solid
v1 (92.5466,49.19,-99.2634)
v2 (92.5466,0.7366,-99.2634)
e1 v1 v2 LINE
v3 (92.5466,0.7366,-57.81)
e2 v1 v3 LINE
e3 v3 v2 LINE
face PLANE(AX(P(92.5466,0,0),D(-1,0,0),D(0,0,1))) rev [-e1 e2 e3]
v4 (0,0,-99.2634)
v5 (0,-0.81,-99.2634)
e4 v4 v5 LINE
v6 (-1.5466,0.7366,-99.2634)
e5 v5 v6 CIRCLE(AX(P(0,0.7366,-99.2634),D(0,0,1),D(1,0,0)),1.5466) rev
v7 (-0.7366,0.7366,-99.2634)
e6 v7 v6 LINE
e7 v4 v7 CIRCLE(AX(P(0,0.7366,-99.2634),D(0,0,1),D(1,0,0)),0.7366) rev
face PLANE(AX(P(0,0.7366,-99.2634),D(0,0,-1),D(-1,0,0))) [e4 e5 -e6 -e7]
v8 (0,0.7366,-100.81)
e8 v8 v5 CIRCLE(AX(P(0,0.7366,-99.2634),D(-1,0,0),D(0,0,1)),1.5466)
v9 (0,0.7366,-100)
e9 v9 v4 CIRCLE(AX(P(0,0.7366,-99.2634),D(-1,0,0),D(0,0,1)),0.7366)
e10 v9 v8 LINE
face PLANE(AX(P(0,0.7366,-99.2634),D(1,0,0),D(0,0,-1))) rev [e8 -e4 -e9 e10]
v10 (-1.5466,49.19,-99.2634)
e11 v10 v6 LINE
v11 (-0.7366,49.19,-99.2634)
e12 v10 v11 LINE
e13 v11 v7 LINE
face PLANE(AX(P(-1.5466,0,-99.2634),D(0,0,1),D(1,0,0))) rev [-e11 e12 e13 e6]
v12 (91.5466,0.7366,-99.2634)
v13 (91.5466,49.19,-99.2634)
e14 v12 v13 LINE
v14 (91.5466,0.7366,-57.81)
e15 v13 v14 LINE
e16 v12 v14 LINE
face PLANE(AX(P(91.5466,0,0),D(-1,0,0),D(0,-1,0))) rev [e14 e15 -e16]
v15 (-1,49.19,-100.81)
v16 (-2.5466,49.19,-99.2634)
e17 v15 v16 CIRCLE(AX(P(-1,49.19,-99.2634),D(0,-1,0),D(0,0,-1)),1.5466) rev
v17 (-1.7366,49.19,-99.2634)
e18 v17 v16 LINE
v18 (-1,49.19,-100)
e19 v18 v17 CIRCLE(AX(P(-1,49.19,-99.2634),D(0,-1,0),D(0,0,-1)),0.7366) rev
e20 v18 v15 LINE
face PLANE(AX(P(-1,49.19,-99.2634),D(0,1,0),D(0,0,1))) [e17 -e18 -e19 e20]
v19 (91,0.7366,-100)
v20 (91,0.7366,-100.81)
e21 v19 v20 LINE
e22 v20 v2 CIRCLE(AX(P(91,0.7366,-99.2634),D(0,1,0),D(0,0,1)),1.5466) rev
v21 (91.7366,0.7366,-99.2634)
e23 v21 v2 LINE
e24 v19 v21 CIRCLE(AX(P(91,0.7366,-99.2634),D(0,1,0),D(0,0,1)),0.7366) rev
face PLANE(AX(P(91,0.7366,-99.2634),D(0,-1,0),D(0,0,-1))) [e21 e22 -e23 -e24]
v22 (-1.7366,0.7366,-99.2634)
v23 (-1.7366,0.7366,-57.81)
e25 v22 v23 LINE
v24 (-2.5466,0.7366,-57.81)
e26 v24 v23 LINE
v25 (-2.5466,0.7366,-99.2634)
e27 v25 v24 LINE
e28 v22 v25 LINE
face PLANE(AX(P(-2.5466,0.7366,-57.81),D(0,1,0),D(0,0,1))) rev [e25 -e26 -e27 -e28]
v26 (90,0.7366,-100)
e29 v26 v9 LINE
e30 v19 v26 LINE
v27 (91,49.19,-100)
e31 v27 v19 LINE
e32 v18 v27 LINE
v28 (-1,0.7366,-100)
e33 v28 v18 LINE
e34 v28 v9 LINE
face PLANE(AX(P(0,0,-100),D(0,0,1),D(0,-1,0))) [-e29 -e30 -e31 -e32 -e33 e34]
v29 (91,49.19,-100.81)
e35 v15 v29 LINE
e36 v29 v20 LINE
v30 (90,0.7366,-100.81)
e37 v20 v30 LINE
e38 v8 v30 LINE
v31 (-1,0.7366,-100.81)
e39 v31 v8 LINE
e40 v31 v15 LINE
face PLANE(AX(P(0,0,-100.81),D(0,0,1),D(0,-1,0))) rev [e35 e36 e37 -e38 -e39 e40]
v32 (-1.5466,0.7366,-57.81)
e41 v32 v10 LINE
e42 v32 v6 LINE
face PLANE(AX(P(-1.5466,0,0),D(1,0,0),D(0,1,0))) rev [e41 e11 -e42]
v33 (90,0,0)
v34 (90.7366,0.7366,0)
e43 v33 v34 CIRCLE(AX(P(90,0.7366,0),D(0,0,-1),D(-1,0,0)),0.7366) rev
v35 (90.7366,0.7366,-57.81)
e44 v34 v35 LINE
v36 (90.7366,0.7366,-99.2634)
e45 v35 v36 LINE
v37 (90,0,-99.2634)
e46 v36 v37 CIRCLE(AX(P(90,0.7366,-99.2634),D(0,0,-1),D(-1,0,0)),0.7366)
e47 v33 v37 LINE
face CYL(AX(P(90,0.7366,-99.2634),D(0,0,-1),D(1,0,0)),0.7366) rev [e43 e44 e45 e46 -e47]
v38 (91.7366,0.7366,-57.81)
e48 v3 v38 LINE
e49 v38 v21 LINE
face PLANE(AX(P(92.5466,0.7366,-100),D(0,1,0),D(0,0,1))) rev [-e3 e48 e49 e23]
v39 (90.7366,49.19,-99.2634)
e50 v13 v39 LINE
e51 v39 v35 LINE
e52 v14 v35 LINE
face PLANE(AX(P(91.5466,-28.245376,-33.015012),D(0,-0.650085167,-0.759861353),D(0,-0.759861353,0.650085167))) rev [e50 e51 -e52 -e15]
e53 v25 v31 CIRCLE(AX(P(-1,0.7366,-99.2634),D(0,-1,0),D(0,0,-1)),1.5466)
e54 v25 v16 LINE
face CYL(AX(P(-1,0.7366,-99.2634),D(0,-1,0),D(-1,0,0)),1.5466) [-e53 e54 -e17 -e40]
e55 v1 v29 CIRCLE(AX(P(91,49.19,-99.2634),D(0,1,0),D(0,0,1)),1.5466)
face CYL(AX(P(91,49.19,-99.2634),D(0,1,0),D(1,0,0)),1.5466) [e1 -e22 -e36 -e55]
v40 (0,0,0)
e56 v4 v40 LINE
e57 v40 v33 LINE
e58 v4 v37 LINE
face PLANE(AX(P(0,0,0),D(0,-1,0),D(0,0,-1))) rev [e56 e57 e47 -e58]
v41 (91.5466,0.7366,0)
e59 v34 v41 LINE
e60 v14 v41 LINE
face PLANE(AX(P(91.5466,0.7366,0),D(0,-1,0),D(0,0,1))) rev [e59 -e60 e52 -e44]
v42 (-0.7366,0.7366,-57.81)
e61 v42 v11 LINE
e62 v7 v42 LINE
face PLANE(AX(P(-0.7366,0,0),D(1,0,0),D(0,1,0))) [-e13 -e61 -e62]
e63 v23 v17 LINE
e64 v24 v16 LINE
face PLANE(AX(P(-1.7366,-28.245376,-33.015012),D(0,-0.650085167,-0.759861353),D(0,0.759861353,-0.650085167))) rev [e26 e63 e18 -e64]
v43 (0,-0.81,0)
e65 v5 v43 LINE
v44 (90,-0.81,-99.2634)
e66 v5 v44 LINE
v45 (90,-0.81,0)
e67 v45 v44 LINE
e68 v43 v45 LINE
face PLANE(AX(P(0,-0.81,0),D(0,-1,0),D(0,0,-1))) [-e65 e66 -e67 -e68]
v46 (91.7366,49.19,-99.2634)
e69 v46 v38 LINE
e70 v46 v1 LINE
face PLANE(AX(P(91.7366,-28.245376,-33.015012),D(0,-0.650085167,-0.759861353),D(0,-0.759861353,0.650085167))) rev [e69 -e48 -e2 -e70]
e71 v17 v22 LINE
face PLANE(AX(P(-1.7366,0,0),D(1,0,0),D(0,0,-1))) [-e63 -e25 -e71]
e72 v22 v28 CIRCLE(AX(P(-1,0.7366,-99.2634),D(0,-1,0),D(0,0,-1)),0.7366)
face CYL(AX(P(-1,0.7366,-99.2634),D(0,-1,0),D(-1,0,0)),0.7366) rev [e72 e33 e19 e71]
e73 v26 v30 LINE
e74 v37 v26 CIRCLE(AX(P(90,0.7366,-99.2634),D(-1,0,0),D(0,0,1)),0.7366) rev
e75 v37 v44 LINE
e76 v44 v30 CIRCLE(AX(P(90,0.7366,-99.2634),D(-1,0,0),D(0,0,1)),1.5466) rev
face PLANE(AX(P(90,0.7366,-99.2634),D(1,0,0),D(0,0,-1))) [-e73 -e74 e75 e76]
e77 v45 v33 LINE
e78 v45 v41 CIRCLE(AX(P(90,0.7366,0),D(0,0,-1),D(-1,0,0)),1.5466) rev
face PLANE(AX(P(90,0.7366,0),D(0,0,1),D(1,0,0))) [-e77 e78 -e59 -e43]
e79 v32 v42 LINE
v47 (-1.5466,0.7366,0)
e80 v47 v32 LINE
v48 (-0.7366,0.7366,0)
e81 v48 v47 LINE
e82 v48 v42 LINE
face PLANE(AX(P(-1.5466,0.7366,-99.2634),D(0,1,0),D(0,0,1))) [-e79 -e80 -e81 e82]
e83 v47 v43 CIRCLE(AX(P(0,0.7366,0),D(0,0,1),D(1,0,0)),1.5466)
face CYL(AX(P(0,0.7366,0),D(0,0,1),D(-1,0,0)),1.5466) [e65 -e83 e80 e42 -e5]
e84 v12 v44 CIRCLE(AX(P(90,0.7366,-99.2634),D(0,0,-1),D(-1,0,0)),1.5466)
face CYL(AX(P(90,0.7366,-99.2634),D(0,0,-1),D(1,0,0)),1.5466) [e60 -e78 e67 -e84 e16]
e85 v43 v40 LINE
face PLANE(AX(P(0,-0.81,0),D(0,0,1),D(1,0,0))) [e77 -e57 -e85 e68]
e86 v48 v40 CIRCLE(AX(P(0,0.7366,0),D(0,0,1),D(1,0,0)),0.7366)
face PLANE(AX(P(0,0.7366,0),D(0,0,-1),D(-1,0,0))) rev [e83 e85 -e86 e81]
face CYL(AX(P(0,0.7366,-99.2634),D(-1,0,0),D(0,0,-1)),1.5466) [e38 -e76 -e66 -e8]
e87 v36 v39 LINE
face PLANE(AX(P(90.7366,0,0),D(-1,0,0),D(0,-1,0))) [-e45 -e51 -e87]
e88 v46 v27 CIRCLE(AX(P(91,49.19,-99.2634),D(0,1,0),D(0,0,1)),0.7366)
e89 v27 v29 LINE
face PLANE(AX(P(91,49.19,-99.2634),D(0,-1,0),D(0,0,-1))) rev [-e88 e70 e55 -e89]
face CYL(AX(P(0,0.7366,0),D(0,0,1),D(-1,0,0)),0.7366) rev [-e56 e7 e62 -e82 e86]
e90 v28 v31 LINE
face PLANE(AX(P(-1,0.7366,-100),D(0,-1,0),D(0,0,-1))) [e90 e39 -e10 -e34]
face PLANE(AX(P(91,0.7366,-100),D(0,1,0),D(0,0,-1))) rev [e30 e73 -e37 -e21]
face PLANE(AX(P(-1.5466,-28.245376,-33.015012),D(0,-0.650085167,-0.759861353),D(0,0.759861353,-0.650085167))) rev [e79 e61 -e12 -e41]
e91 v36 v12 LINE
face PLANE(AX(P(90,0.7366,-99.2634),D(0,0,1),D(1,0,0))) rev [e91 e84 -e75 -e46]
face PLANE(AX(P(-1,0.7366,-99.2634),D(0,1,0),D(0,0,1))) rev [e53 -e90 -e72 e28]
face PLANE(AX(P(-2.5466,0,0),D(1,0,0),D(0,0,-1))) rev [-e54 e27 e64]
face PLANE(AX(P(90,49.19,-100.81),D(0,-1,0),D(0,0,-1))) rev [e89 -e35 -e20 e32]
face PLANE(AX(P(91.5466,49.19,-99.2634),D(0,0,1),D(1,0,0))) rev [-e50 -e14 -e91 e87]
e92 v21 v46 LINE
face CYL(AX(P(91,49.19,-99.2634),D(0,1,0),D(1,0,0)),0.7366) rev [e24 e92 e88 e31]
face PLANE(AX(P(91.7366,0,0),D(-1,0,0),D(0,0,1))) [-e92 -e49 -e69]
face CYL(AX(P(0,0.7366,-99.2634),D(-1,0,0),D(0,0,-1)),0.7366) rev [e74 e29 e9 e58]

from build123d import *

# Parameters (mm, degrees)
SKETCH1_W                    = 90
SKETCH1_H                    = 100
BASE_FLANGE1_DEPTH           = 0.81
EDGE_FLANGE1_STRIP_W         = 4.7132
EDGE_FLANGE1_STRIP_H         = 0.81
EDGE_FLANGE1_STRIP_CUT_DEPTH = 90
EDGE_FLANGE1_DEPTH           = 90
EDGE_FLANGE2_DEPTH           = 48.4534
EDGE_FLANGE2_BEND_DEPTH      = 48.4534
EDGE_FLANGE3_DEPTH           = 99.2634
EDGE_FLANGE3_BEND_DEPTH      = 99.2634
CUT_EXTRUDE1_REACH           = 149.055


# Sheet-metal steps are written as plain solids
with BuildPart() as part:
    # Sketch1 → Base-Flange1 (new body)
    with BuildSketch(Plane(origin=(0, 0, 0), x_dir=(1, 0, 0), z_dir=(0, 1, 0))):
        with Locations((45, 50)):
            Rectangle(SKETCH1_W, SKETCH1_H)
    extrude(amount=-BASE_FLANGE1_DEPTH)

    # Edge-Flange1 strip (across the edge) → Edge-Flange1 strip cut (cut)
    with BuildSketch(Plane(origin=(90, 0, -100), x_dir=(0, 0, 1), z_dir=(-1, 0, 0))):
        with Locations((-1.62, -0.405)):
            Rectangle(EDGE_FLANGE1_STRIP_W, EDGE_FLANGE1_STRIP_H)
    extrude(amount=EDGE_FLANGE1_STRIP_CUT_DEPTH, mode=Mode.SUBTRACT)

    # Edge-Flange1 section (across the edge) → Edge-Flange1 (add)
    with BuildSketch(Plane(origin=(90, 0, -100), x_dir=(0, 0, 1), z_dir=(-1, 0, 0))):
        with BuildLine():
            Line((-0.81, 0.7366), (-0.81, 49.19))
            Line((-0.81, 49.19), (0, 49.19))
            Line((0, 49.19), (0, 0.7366))
            ThreePointArc((0, 0.7366), (0.215745145, 0.215745145), (0.7366, 0))
            Line((0.7366, 0), (0.7366, -0.81))
            ThreePointArc((0.7366, -0.81), (-0.357011348, -0.357011348), (-0.81, 0.7366))
        make_face()
    extrude(amount=EDGE_FLANGE1_DEPTH)

    # Edge-Flange2 section (across the edge) → Edge-Flange2 (add)
    with BuildSketch(Plane(origin=(-1.7366, 49.19, -100), x_dir=(1, 0, 0), z_dir=(0, -1, 0))):
        with BuildLine():
            Line((-0.81, 0.7366), (-0.81, 42.19))
            Line((-0.81, 42.19), (0, 42.19))
            Line((0, 42.19), (0, 0.7366))
            ThreePointArc((0, 0.7366), (0.215745145, 0.215745145), (0.7366, 0))
            Line((0.7366, 0), (1.7366, 0))
            Line((1.7366, 0), (1.7366, -0.81))
            Line((1.7366, -0.81), (0.7366, -0.81))
            ThreePointArc((0.7366, -0.81), (-0.357011348, -0.357011348), (-0.81, 0.7366))
        make_face()
    extrude(amount=EDGE_FLANGE2_DEPTH)

    # Edge-Flange2 section 2 (across the edge) → Edge-Flange2 bend (add)
    with BuildSketch(Plane(origin=(91.7366, 0.7366, -100), x_dir=(-1, 0, 0), z_dir=(0, 1, 0))):
        with BuildLine():
            Line((-0.81, 0.7366), (-0.81, 42.19))
            Line((-0.81, 42.19), (0, 42.19))
            Line((0, 42.19), (0, 0.7366))
            ThreePointArc((0, 0.7366), (0.215745145, 0.215745145), (0.7366, 0))
            Line((0.7366, 0), (1.7366, 0))
            Line((1.7366, 0), (1.7366, -0.81))
            Line((1.7366, -0.81), (0.7366, -0.81))
            ThreePointArc((0.7366, -0.81), (-0.357011348, -0.357011348), (-0.81, 0.7366))
        make_face()
    extrude(amount=EDGE_FLANGE2_BEND_DEPTH)

    # Edge-Flange3 section (across the edge) → Edge-Flange3 (add)
    with BuildSketch(Plane(origin=(-0.7366, 0, -99.2634), x_dir=(1, 0, 0), z_dir=(0, 0, 1))):
        with BuildLine():
            Line((-0.81, 0.7366), (-0.81, 49.19))
            Line((-0.81, 49.19), (0, 49.19))
            Line((0, 49.19), (0, 0.7366))
            ThreePointArc((0, 0.7366), (0.215745145, 0.215745145), (0.7366, 0))
            Line((0.7366, 0), (0.7366, -0.81))
            ThreePointArc((0.7366, -0.81), (-0.357011348, -0.357011348), (-0.81, 0.7366))
        make_face()
    extrude(amount=EDGE_FLANGE3_DEPTH)

    # Edge-Flange3 section 2 (across the edge) → Edge-Flange3 bend (add)
    with BuildSketch(Plane(origin=(90.7366, 0, 0), x_dir=(-1, 0, 0), z_dir=(0, 0, -1))):
        with BuildLine():
            Line((-0.81, 0.7366), (-0.81, 49.19))
            Line((-0.81, 49.19), (0, 49.19))
            Line((0, 49.19), (0, 0.7366))
            ThreePointArc((0, 0.7366), (0.215745145, 0.215745145), (0.7366, 0))
            Line((0.7366, 0), (0.7366, -0.81))
            ThreePointArc((0.7366, -0.81), (-0.357011348, -0.357011348), (-0.81, 0.7366))
        make_face()
    extrude(amount=EDGE_FLANGE3_BEND_DEPTH)

    # Cut-Extrude1: up to this face of the body (flat: up to its plane)
    cut_extrude1_end = Plane(part.part.faces().sort_by_distance((92.5466, 24.9633, -78.5367))[0])
    # Sketch23 → Cut-Extrude1 (cut, up to the picked face)
    with BuildSketch(Plane.ZY.offset(2.5466), mode=Mode.PRIVATE) as cut_extrude1_sk1:
        Polygon((-99.2634, 49.19), (-57.81, 0.7366), (0, 0.7366), (0, 49.19), align=None)
    cut_extrude1_tool1 = split(extrude(cut_extrude1_sk1.sketch, amount=-CUT_EXTRUDE1_REACH, mode=Mode.PRIVATE), bisect_by=cut_extrude1_end, keep=Keep.BOTH, mode=Mode.PRIVATE)
    add(cut_extrude1_tool1.solids().sort_by(Axis((-2.5466, 27.094531, -40.180017), (1, 0, 0)))[0], mode=Mode.SUBTRACT)


solid = part.part
